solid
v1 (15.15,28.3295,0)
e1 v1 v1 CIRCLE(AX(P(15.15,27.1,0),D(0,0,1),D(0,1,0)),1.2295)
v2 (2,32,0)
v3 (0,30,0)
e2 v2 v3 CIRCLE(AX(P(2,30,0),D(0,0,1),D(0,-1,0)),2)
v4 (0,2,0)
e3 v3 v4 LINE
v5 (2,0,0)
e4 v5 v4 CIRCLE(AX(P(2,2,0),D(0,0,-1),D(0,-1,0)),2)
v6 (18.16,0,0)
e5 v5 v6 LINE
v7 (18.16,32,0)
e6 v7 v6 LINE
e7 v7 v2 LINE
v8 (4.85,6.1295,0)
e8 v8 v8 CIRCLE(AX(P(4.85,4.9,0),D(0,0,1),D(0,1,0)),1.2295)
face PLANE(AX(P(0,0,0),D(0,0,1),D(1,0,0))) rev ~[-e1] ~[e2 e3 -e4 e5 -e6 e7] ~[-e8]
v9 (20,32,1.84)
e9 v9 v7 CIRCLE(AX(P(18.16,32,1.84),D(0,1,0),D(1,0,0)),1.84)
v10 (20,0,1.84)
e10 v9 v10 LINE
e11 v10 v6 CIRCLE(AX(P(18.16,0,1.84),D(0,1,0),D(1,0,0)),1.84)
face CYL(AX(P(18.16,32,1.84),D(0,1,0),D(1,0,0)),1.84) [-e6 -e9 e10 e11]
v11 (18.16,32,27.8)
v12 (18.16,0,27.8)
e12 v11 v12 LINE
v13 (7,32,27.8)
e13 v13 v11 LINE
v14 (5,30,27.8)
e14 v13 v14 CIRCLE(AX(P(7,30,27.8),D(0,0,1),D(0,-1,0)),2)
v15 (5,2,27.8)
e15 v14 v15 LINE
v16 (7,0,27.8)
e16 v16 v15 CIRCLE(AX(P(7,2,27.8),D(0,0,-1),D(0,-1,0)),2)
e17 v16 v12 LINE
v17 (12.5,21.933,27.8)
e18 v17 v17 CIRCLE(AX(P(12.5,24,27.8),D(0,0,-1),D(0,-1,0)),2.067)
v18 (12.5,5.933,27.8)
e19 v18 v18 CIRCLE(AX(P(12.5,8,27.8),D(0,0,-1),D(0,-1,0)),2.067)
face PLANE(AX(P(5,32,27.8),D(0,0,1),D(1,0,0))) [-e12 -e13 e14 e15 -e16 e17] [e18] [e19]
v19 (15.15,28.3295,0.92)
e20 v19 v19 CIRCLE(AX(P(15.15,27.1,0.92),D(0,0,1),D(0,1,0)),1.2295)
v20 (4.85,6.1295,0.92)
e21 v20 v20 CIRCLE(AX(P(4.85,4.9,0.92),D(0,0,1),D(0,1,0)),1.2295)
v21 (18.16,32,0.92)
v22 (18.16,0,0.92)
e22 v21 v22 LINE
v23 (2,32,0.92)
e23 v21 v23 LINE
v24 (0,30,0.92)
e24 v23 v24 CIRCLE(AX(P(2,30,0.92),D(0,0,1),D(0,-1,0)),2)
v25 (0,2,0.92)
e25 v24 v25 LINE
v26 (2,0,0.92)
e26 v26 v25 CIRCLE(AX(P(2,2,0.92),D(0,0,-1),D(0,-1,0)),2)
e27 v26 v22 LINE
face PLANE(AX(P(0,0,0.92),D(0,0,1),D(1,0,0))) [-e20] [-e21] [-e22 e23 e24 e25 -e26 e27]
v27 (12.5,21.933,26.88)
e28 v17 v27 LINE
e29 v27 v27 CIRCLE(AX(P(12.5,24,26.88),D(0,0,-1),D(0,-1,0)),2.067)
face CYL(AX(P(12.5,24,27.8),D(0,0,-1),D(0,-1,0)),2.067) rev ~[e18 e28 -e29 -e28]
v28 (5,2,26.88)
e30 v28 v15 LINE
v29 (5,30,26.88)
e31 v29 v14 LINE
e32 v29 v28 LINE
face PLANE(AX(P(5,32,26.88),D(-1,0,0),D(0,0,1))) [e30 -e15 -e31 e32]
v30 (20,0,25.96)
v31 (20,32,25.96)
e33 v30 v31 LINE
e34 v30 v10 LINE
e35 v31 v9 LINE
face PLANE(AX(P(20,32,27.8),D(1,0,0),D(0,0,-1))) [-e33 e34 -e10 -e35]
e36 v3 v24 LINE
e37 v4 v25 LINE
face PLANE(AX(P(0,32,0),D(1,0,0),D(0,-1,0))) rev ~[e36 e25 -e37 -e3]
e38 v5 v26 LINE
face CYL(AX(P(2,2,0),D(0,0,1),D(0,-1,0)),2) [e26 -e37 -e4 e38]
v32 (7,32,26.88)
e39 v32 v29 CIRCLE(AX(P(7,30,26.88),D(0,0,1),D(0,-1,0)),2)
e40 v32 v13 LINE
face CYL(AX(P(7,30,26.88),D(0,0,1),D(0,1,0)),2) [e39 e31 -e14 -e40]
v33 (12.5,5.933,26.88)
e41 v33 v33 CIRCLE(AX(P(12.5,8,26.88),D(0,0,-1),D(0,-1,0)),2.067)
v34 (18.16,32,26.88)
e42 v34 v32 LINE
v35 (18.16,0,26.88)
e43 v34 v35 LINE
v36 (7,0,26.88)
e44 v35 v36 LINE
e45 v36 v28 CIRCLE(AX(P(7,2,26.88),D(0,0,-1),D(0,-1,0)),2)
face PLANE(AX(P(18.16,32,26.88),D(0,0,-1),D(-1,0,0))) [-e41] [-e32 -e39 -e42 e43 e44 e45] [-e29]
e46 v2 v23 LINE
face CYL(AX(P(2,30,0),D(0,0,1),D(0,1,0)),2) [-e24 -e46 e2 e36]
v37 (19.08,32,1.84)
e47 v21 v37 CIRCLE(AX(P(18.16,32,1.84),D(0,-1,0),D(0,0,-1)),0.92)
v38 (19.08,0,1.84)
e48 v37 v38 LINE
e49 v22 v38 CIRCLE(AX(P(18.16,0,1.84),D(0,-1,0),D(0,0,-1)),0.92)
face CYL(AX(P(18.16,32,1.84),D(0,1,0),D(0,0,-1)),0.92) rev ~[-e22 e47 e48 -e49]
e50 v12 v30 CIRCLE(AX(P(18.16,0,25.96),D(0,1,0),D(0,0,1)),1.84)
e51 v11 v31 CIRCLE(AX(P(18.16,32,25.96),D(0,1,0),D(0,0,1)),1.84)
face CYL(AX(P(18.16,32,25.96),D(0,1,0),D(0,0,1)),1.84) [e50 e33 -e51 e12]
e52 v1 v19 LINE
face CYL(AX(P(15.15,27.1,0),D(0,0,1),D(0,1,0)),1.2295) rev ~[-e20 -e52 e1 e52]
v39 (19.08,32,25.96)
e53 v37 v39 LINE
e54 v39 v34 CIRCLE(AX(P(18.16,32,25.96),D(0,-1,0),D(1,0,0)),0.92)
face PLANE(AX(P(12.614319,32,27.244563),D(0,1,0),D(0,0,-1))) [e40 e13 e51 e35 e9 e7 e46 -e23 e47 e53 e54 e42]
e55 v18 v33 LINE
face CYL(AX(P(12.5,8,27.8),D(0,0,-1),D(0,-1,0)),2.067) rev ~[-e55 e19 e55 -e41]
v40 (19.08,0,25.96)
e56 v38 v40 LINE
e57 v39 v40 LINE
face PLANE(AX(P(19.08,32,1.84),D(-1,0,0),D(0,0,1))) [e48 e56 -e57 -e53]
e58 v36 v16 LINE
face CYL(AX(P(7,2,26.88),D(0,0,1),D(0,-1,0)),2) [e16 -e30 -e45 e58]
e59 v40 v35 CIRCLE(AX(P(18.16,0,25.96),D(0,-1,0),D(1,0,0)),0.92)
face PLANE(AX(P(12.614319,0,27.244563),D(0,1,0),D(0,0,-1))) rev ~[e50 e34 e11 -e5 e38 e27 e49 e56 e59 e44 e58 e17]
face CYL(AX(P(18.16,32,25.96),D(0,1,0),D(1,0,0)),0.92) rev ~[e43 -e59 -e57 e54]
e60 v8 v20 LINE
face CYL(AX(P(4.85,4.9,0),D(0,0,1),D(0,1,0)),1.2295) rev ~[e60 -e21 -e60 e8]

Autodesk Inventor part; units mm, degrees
ref_plane "YZ Plane" through (0, 0, 0) normal (1, 0, 0) x (0, 1, 0)
ref_plane "XZ Plane" through (0, 0, 0) normal (0, 1, 0) x (-1, 0, 0)
ref_plane "XY Plane" through (0, 0, 0) normal (0, 0, 1) x (1, 0, 0)
sketch "Sketch2" plane through (0, 0, 0) normal (0, 0, 1) x (1, 0, 0)
  line L0 (0, 0) -> (20, 0)
  line L1 (20, 0) -> (20, 32)
  line L2 (20, 32) -> (0, 32)
  line L3 (0, 32) -> (0, 0)
  dimension "d0" = 20
  dimension "d1" = 32
extrude "Plate1" add sketch "Sketch2" along normal blind 0.92
sketch "Sketch3" plane through (19.08, 32, 0) normal (1, 0, 0) x (0, 1, 0)
  line L0 (-32, 0) -> (0, 0)
  line L1 (0, 0) -> (0, 27.8)
  line L2 (0, 27.8) -> (-32, 27.8)
  line L3 (-32, 27.8) -> (-32, 0)
edge flange "Flange1" height 27.8 angle 90 thickness 0.92 bend radius 0.92 thickness toward (1, 0, 0) relief tear relief width 0.92 relief depth 0.46 edges at (20, 16, 0.92) wall of the first edge with corners at (19.08, 0, 0) (19.08, 32, 0) (19.08, 32, 27.8) (19.08, 0, 27.8)
bend "Bend1"
corner "Corner1"
sketch "Sketch4" plane through (20, 32, 26.88) normal (0, 0, 1) x (1, 0, 0)
  line L0 (0, -32) -> (0, 0)
  line L1 (0, 0) -> (-15, 0)
  line L2 (-15, 0) -> (-15, -32)
  line L3 (-15, -32) -> (0, -32)
edge flange "Flange2" height 15 angle 90 thickness 0.92 bend radius 0.92 thickness toward (0, 0, 1) relief tear relief width 0.92 relief depth 0.46 edges at (19.08, 16, 27.8) wall of the first edge with corners at (20, 0, 26.88) (20, 32, 26.88) (5, 32, 26.88) (5, 0, 26.88)
bend "Bend2"
corner "Corner2"
fillet "Fillet2" radius 2 4 edges at (0, 0, 0.46) (5, 32, 27.34) (5, 0, 27.34) (0, 32, 0.46)
sketch "Sketch5" plane through (0, 0, 0) normal (0, 0, -1) x (-1, 0, 0)
  line L0 (-20, 0) -> (-20, 32) projected
  line L1 (-18.16, 32) -> (-2, 32) projected
  line L2 (0, 30) -> (0, 2) projected
  line L3 (-2, 0) -> (-18.16, 0) projected
  point P0 (0, 0)
  point P1 (-15.15, 27.1)
  point P2 (-4.85, 4.9)
  dimension "d35" = 4.85
  dimension "d36" = 4.9
  dimension "d37" = 4.9
  dimension "d38" = 4.85
hole "Hole1" at (15.15, 27.1, 0) at (4.85, 4.9, 0) direction (0, 0, 1) diameter 2.459 depth 2 tip angle 137 thread size "M3x0.5" class "6H" standard "ISO Metric profile"
sketch "Sketch6" plane through (18.16, 0, 27.8) normal (0, 0, 1) x (1, 0, 0)
  line L0 (-11.16, 32) -> (0, 32) projected
  line L1 (0, 0) -> (-11.16, 0) projected
  line L2 (-13.16, 2) -> (-13.16, 30) projected
  point P0 (-18.16, 0)
  point P1 (-5.66, 24)
  point P2 (-5.66, 8)
  dimension "d46" = 8
  dimension "d47" = 8
  dimension "d48" = 7.5
  dimension "d49" = 7.5
hole "Hole2" at (12.5, 24, 27.8) at (12.5, 8, 27.8) direction (0, 0, -1) diameter 4.134 depth 2 tip angle 137 thread size "M5x0.8" class "6H" standard "ISO Metric profile"
equation "\"d2\" = Thickness"
equation "\"d3\" = BendReliefWidth"
equation "\"d4\" = BendReliefDepth"
equation "\"d5\" = MinimumRemnant"
equation "\"d6\" = TransitionRadius"
equation "\"d9\" = BendRadius"
equation "\"d10\" = CornerReliefSize"
equation "\"d11\" = GapSize"
equation "\"d12\" = JacobiRadiusSize"
equation "\"d13\" = BendReliefWidth"
equation "\"d14\" = BendReliefDepth"
equation "\"d15\" = MinimumRemnant"
equation "\"d16\" = TransitionRadius"
equation "\"d19\" = BendRadius"
equation "\"d20\" = CornerReliefSize"
equation "\"d21\" = GapSize"
equation "\"d22\" = JacobiRadiusSize"
equation "\"BendRadius\" = Thickness"
equation "\"BendReliefWidth\" = Thickness"
equation "\"BendReliefDepth\" = 0.5 * Thickness"
equation "\"CornerReliefSize\" = 4 * Thickness"
equation "\"MinimumRemnant\" = 2 * Thickness"
equation "\"TransitionRadius\" = BendRadius"
equation "\"JacobiRadiusSize\" = BendRadius"
equation "\"GapSize\" = Thickness"
equation "\"Thickness\" = 0.92"
properties part number "Soporte final de carrera" material "Steel AISI 1006 85 HR"
